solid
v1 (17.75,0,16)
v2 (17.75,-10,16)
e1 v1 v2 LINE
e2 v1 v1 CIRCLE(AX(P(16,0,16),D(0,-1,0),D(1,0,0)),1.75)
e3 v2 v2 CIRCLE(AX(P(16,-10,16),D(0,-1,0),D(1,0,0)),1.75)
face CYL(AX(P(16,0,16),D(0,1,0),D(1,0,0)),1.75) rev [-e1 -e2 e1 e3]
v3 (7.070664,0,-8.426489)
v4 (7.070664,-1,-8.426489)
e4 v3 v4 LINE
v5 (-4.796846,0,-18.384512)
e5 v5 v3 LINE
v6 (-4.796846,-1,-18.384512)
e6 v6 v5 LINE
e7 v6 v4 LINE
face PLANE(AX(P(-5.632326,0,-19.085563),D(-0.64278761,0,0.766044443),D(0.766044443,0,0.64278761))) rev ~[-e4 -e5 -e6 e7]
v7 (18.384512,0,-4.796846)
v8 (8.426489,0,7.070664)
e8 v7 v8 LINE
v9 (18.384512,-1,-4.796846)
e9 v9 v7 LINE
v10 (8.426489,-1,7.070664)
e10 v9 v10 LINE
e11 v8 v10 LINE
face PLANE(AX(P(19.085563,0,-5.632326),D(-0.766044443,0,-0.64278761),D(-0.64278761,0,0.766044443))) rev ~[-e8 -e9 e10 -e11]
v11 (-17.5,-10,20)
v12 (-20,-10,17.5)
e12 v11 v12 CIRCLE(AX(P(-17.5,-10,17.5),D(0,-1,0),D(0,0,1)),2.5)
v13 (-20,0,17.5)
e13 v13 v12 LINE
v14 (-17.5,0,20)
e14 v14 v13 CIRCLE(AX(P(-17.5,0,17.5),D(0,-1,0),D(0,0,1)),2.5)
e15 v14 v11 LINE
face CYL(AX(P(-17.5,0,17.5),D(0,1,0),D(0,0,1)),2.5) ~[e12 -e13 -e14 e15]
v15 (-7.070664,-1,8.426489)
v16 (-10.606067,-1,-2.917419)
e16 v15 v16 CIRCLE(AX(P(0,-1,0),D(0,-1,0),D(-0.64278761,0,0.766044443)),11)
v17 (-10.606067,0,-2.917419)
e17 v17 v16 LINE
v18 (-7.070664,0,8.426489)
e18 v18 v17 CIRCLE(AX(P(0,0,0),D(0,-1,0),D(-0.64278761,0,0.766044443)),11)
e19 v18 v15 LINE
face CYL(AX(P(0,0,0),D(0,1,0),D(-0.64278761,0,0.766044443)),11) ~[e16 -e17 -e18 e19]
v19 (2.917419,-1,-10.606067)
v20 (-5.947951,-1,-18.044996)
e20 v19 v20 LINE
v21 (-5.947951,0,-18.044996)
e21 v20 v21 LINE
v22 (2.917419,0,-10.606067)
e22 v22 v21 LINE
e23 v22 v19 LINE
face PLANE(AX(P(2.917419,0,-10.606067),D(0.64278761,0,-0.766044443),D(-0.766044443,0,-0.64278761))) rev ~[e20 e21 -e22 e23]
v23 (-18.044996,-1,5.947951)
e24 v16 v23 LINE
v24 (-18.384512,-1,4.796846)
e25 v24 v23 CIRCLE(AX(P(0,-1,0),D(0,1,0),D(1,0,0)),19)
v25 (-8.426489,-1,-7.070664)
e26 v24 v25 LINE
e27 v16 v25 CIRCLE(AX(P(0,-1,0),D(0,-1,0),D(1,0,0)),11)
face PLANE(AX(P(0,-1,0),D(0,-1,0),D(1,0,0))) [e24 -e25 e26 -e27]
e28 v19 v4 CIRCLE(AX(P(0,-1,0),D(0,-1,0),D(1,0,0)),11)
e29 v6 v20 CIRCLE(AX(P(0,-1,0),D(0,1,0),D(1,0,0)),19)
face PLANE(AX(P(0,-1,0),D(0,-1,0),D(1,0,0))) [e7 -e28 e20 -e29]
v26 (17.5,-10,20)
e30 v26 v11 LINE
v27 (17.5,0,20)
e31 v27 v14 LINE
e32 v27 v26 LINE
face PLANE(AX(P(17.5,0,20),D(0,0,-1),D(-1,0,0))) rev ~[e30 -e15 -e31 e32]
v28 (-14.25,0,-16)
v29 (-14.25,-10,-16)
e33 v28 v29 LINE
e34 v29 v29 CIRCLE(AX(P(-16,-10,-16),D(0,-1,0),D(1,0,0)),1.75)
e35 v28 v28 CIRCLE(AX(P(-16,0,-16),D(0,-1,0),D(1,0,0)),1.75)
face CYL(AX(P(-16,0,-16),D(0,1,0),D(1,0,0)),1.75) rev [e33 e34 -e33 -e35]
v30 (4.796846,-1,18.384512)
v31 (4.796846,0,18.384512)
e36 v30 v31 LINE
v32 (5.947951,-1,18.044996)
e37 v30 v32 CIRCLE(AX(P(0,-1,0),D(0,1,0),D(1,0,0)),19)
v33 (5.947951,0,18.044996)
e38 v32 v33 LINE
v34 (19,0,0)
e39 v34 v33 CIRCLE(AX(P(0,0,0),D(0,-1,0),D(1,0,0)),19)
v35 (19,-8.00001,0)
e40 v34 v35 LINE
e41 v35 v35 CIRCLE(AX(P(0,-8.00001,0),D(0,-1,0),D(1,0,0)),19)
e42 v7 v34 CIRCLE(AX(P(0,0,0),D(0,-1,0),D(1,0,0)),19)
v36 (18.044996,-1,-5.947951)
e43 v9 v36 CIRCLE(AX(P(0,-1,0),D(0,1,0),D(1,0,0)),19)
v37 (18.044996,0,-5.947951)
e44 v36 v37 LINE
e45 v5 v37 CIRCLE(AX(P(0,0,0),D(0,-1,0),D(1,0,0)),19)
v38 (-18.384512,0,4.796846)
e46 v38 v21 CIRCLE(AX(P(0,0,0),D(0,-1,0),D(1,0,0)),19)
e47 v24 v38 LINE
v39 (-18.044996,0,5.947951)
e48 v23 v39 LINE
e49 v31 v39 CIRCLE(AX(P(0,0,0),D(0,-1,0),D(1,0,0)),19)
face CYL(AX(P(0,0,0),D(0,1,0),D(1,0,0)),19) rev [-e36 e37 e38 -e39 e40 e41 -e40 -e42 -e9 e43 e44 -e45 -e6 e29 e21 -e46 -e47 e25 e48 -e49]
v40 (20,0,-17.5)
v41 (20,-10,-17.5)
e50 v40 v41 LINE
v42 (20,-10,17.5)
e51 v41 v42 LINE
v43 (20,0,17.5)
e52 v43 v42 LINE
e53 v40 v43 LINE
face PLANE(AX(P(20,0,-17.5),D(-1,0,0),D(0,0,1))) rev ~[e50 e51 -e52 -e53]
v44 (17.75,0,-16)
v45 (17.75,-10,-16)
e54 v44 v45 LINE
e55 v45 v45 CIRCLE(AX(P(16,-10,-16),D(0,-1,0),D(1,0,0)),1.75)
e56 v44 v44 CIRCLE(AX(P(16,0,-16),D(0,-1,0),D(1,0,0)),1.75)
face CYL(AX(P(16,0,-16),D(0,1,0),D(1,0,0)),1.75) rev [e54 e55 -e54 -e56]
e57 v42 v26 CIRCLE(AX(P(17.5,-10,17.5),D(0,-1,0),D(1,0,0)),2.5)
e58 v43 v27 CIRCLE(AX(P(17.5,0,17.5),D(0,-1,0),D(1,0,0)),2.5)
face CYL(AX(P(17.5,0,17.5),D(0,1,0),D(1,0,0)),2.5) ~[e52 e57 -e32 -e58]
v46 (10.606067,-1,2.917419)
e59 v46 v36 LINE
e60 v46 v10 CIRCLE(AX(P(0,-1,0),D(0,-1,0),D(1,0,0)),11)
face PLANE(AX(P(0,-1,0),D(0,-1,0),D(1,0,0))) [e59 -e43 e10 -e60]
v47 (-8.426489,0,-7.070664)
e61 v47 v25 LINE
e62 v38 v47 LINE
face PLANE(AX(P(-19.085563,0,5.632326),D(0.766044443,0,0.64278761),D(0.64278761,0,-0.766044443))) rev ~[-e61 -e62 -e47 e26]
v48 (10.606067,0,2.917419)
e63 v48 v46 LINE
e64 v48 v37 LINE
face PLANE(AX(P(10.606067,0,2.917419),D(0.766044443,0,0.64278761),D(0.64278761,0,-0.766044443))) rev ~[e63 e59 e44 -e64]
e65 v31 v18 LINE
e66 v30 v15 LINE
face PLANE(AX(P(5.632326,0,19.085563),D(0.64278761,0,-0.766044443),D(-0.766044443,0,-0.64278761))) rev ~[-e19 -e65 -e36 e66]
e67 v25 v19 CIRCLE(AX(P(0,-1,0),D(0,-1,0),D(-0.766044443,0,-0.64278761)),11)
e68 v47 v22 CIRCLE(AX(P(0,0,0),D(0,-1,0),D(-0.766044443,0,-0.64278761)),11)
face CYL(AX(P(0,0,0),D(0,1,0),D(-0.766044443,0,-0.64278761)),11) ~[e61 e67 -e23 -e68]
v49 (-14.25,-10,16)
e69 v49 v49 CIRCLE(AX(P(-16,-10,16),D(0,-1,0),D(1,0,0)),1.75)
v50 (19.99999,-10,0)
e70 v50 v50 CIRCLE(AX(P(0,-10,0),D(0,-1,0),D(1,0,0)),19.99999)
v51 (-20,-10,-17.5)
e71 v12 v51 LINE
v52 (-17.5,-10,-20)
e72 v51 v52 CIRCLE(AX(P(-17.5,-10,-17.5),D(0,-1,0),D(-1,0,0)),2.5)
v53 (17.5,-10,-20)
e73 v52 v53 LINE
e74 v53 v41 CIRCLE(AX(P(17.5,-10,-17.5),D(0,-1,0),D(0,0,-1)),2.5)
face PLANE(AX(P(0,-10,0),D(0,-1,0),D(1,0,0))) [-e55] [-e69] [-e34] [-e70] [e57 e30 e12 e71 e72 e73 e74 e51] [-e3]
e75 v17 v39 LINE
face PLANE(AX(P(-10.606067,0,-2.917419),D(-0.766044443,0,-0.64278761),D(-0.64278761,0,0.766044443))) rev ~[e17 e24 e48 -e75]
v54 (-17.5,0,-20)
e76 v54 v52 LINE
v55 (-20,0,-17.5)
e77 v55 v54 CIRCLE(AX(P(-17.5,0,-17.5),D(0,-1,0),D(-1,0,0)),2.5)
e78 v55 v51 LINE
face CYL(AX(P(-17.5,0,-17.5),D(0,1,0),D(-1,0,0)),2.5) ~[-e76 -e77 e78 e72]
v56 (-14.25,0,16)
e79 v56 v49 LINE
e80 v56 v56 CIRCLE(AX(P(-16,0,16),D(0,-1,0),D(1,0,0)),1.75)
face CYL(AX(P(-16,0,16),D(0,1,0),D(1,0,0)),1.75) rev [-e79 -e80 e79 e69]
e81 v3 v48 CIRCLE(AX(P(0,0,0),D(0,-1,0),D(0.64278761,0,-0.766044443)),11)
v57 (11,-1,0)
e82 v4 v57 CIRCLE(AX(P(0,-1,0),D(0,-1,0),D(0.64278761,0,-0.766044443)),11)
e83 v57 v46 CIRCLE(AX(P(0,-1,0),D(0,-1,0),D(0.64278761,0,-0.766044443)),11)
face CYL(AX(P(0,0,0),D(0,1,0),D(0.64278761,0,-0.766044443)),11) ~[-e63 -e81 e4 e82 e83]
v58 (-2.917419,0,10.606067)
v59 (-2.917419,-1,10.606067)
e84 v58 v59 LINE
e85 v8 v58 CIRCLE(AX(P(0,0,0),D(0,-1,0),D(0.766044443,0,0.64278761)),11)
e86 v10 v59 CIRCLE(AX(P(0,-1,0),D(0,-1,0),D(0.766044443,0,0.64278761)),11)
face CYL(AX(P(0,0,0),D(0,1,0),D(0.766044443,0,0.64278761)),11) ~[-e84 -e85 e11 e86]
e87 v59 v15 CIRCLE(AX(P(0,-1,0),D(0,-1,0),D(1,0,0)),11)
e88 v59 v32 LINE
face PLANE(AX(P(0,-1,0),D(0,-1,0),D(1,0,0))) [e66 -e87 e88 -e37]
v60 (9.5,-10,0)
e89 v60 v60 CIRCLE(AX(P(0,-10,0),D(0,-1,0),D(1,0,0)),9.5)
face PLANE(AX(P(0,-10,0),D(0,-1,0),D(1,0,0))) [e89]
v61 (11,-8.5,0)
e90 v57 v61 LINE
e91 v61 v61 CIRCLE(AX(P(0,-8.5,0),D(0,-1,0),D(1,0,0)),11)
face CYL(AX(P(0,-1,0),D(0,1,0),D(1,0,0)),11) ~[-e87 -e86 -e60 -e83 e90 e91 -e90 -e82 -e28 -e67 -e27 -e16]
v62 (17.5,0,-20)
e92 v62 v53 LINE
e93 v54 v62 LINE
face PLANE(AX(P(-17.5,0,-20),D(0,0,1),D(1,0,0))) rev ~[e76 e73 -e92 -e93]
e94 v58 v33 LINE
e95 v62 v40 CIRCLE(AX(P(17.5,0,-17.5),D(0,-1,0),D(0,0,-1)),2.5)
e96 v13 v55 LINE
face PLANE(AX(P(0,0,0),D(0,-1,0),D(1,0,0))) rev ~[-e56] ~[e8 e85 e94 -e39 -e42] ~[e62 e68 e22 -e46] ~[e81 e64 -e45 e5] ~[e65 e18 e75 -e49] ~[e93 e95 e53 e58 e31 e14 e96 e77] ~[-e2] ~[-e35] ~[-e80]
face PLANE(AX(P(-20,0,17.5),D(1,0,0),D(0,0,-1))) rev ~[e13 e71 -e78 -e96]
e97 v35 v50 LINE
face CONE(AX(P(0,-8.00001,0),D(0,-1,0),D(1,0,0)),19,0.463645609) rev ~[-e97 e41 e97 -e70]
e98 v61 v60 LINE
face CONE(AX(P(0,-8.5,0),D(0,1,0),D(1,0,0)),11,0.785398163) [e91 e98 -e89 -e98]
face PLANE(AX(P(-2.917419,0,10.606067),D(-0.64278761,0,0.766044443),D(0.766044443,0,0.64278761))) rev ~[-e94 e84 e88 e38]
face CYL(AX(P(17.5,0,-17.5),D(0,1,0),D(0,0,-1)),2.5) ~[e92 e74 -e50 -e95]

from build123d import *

# Parameters (mm, degrees)
F0_R     = 1.75
F0_R_2   = 19
F1_DEPTH = 10
F3_DEPTH = 1
F4_R     = 11
F5_DEPTH = 9
F7_SIZE2 = 0.99999
F7_SIZE  = 1.99999


# Not quite as in the source:
# - a fillet or chamfer that OpenCascade refuses, or shapes differently, is made with other operations: its cross-section is extruded or revolved along the edge and cut away or added
# - a fillet or chamfer is up to 0.001 mm smaller than in the source, because OpenCascade refuses the exact size


with BuildPart() as f1:
    # F0 (on Front) → F1 (new body)
    with BuildSketch(Plane.XZ):
        with BuildLine():
            Line((-17.5, -20), (17.5, -20))
            ThreePointArc((17.5, -20), (19.267766953, -19.267766953), (20, -17.5))
            Line((20, -17.5), (20, 17.5))
            ThreePointArc((20, 17.5), (19.267766953, 19.267766953), (17.5, 20))
            Line((17.5, 20), (-17.5, 20))
            ThreePointArc((-17.5, 20), (-19.267766953, 19.267766953), (-20, 17.5))
            Line((-20, 17.5), (-20, -17.5))
            ThreePointArc((-20, -17.5), (-19.267766953, -19.267766953), (-17.5, -20))
        make_face()
        with Locations((-16, -16)):
            Circle(F0_R, mode=Mode.SUBTRACT)
        with Locations((16, -16)):
            Circle(F0_R, mode=Mode.SUBTRACT)
        with Locations((-16, 16)):
            Circle(F0_R, mode=Mode.SUBTRACT)
        Circle(F0_R_2, mode=Mode.SUBTRACT)
        with Locations((16, 16)):
            Circle(F0_R, mode=Mode.SUBTRACT)
    extrude(amount=F1_DEPTH)

    # F2 (on Front) → F3 (join)
    with BuildSketch(Plane.XZ):
        with BuildLine():
            Line((5.6323262572, 19.0855630677), (-7.0706637066, 8.4264888743))
            ThreePointArc((-7.0706637066, 8.4264888743), (-10.5017983633, 3.2729544964), (-10.6060673084, -2.9174194506))
            Line((-10.6060673084, -2.9174194506), (-18.3195186246, 6.2751138669))
            Line((-18.3195186246, 6.2751138669), (-19.0855630677, 5.6323262572))
            Line((-19.0855630677, 5.6323262572), (-8.4264888743, -7.0706637066))
            ThreePointArc((-8.4264888743, -7.0706637066), (-3.2729544964, -10.5017983633), (2.9174194506, -10.6060673084))
            Line((2.9174194506, -10.6060673084), (-6.2751138669, -18.3195186246))
            Line((-6.2751138669, -18.3195186246), (-5.6323262572, -19.0855630677))
            Line((-5.6323262572, -19.0855630677), (7.0706637066, -8.4264888743))
            ThreePointArc((7.0706637066, -8.4264888743), (10.5017983633, -3.2729544964), (10.6060673084, 2.9174194506))
            Line((10.6060673084, 2.9174194506), (18.3195186246, -6.2751138669))
            Line((18.3195186246, -6.2751138669), (19.0855630677, -5.6323262572))
            Line((19.0855630677, -5.6323262572), (8.4264888743, 7.0706637066))
            ThreePointArc((8.4264888743, 7.0706637066), (3.2729544964, 10.5017983633), (-2.9174194506, 10.6060673084))
            Line((-2.9174194506, 10.6060673084), (6.2751138669, 18.3195186246))
            Line((6.2751138669, 18.3195186246), (5.6323262572, 19.0855630677))
        make_face()
    extrude(amount=F3_DEPTH)

    # F4 (on face) → F5 (join)
    with BuildSketch(Plane.XZ.offset(1)):
        Circle(F4_R)
    extrude(amount=F5_DEPTH)

    # F6: chamfer of 1.5 on 1 edges, made by hand

    # F6_s1 → F6_t2 (revolve, cut)
    with BuildSketch(Plane.XY):
        Polygon((11, -8.5), (9.5, -10), (11, -10), align=None)
    revolve(axis=Axis((0, -10, 0), (0, -1, 0)), mode=Mode.SUBTRACT)

    # F7 (size 2 and 1 in the source; OpenCascade refuses exactly that, so slightly less here)
    f7_edges = [f1.edges().sort_by_distance(p)[0] for p in [
        (-19, -10, 0),
    ]]
    f7_side = f1.faces().sort_by_distance((-19, -5, 0))[0]
    chamfer(f7_edges, length=F7_SIZE, length2=F7_SIZE2, reference=f7_side)


solid = f1.part
